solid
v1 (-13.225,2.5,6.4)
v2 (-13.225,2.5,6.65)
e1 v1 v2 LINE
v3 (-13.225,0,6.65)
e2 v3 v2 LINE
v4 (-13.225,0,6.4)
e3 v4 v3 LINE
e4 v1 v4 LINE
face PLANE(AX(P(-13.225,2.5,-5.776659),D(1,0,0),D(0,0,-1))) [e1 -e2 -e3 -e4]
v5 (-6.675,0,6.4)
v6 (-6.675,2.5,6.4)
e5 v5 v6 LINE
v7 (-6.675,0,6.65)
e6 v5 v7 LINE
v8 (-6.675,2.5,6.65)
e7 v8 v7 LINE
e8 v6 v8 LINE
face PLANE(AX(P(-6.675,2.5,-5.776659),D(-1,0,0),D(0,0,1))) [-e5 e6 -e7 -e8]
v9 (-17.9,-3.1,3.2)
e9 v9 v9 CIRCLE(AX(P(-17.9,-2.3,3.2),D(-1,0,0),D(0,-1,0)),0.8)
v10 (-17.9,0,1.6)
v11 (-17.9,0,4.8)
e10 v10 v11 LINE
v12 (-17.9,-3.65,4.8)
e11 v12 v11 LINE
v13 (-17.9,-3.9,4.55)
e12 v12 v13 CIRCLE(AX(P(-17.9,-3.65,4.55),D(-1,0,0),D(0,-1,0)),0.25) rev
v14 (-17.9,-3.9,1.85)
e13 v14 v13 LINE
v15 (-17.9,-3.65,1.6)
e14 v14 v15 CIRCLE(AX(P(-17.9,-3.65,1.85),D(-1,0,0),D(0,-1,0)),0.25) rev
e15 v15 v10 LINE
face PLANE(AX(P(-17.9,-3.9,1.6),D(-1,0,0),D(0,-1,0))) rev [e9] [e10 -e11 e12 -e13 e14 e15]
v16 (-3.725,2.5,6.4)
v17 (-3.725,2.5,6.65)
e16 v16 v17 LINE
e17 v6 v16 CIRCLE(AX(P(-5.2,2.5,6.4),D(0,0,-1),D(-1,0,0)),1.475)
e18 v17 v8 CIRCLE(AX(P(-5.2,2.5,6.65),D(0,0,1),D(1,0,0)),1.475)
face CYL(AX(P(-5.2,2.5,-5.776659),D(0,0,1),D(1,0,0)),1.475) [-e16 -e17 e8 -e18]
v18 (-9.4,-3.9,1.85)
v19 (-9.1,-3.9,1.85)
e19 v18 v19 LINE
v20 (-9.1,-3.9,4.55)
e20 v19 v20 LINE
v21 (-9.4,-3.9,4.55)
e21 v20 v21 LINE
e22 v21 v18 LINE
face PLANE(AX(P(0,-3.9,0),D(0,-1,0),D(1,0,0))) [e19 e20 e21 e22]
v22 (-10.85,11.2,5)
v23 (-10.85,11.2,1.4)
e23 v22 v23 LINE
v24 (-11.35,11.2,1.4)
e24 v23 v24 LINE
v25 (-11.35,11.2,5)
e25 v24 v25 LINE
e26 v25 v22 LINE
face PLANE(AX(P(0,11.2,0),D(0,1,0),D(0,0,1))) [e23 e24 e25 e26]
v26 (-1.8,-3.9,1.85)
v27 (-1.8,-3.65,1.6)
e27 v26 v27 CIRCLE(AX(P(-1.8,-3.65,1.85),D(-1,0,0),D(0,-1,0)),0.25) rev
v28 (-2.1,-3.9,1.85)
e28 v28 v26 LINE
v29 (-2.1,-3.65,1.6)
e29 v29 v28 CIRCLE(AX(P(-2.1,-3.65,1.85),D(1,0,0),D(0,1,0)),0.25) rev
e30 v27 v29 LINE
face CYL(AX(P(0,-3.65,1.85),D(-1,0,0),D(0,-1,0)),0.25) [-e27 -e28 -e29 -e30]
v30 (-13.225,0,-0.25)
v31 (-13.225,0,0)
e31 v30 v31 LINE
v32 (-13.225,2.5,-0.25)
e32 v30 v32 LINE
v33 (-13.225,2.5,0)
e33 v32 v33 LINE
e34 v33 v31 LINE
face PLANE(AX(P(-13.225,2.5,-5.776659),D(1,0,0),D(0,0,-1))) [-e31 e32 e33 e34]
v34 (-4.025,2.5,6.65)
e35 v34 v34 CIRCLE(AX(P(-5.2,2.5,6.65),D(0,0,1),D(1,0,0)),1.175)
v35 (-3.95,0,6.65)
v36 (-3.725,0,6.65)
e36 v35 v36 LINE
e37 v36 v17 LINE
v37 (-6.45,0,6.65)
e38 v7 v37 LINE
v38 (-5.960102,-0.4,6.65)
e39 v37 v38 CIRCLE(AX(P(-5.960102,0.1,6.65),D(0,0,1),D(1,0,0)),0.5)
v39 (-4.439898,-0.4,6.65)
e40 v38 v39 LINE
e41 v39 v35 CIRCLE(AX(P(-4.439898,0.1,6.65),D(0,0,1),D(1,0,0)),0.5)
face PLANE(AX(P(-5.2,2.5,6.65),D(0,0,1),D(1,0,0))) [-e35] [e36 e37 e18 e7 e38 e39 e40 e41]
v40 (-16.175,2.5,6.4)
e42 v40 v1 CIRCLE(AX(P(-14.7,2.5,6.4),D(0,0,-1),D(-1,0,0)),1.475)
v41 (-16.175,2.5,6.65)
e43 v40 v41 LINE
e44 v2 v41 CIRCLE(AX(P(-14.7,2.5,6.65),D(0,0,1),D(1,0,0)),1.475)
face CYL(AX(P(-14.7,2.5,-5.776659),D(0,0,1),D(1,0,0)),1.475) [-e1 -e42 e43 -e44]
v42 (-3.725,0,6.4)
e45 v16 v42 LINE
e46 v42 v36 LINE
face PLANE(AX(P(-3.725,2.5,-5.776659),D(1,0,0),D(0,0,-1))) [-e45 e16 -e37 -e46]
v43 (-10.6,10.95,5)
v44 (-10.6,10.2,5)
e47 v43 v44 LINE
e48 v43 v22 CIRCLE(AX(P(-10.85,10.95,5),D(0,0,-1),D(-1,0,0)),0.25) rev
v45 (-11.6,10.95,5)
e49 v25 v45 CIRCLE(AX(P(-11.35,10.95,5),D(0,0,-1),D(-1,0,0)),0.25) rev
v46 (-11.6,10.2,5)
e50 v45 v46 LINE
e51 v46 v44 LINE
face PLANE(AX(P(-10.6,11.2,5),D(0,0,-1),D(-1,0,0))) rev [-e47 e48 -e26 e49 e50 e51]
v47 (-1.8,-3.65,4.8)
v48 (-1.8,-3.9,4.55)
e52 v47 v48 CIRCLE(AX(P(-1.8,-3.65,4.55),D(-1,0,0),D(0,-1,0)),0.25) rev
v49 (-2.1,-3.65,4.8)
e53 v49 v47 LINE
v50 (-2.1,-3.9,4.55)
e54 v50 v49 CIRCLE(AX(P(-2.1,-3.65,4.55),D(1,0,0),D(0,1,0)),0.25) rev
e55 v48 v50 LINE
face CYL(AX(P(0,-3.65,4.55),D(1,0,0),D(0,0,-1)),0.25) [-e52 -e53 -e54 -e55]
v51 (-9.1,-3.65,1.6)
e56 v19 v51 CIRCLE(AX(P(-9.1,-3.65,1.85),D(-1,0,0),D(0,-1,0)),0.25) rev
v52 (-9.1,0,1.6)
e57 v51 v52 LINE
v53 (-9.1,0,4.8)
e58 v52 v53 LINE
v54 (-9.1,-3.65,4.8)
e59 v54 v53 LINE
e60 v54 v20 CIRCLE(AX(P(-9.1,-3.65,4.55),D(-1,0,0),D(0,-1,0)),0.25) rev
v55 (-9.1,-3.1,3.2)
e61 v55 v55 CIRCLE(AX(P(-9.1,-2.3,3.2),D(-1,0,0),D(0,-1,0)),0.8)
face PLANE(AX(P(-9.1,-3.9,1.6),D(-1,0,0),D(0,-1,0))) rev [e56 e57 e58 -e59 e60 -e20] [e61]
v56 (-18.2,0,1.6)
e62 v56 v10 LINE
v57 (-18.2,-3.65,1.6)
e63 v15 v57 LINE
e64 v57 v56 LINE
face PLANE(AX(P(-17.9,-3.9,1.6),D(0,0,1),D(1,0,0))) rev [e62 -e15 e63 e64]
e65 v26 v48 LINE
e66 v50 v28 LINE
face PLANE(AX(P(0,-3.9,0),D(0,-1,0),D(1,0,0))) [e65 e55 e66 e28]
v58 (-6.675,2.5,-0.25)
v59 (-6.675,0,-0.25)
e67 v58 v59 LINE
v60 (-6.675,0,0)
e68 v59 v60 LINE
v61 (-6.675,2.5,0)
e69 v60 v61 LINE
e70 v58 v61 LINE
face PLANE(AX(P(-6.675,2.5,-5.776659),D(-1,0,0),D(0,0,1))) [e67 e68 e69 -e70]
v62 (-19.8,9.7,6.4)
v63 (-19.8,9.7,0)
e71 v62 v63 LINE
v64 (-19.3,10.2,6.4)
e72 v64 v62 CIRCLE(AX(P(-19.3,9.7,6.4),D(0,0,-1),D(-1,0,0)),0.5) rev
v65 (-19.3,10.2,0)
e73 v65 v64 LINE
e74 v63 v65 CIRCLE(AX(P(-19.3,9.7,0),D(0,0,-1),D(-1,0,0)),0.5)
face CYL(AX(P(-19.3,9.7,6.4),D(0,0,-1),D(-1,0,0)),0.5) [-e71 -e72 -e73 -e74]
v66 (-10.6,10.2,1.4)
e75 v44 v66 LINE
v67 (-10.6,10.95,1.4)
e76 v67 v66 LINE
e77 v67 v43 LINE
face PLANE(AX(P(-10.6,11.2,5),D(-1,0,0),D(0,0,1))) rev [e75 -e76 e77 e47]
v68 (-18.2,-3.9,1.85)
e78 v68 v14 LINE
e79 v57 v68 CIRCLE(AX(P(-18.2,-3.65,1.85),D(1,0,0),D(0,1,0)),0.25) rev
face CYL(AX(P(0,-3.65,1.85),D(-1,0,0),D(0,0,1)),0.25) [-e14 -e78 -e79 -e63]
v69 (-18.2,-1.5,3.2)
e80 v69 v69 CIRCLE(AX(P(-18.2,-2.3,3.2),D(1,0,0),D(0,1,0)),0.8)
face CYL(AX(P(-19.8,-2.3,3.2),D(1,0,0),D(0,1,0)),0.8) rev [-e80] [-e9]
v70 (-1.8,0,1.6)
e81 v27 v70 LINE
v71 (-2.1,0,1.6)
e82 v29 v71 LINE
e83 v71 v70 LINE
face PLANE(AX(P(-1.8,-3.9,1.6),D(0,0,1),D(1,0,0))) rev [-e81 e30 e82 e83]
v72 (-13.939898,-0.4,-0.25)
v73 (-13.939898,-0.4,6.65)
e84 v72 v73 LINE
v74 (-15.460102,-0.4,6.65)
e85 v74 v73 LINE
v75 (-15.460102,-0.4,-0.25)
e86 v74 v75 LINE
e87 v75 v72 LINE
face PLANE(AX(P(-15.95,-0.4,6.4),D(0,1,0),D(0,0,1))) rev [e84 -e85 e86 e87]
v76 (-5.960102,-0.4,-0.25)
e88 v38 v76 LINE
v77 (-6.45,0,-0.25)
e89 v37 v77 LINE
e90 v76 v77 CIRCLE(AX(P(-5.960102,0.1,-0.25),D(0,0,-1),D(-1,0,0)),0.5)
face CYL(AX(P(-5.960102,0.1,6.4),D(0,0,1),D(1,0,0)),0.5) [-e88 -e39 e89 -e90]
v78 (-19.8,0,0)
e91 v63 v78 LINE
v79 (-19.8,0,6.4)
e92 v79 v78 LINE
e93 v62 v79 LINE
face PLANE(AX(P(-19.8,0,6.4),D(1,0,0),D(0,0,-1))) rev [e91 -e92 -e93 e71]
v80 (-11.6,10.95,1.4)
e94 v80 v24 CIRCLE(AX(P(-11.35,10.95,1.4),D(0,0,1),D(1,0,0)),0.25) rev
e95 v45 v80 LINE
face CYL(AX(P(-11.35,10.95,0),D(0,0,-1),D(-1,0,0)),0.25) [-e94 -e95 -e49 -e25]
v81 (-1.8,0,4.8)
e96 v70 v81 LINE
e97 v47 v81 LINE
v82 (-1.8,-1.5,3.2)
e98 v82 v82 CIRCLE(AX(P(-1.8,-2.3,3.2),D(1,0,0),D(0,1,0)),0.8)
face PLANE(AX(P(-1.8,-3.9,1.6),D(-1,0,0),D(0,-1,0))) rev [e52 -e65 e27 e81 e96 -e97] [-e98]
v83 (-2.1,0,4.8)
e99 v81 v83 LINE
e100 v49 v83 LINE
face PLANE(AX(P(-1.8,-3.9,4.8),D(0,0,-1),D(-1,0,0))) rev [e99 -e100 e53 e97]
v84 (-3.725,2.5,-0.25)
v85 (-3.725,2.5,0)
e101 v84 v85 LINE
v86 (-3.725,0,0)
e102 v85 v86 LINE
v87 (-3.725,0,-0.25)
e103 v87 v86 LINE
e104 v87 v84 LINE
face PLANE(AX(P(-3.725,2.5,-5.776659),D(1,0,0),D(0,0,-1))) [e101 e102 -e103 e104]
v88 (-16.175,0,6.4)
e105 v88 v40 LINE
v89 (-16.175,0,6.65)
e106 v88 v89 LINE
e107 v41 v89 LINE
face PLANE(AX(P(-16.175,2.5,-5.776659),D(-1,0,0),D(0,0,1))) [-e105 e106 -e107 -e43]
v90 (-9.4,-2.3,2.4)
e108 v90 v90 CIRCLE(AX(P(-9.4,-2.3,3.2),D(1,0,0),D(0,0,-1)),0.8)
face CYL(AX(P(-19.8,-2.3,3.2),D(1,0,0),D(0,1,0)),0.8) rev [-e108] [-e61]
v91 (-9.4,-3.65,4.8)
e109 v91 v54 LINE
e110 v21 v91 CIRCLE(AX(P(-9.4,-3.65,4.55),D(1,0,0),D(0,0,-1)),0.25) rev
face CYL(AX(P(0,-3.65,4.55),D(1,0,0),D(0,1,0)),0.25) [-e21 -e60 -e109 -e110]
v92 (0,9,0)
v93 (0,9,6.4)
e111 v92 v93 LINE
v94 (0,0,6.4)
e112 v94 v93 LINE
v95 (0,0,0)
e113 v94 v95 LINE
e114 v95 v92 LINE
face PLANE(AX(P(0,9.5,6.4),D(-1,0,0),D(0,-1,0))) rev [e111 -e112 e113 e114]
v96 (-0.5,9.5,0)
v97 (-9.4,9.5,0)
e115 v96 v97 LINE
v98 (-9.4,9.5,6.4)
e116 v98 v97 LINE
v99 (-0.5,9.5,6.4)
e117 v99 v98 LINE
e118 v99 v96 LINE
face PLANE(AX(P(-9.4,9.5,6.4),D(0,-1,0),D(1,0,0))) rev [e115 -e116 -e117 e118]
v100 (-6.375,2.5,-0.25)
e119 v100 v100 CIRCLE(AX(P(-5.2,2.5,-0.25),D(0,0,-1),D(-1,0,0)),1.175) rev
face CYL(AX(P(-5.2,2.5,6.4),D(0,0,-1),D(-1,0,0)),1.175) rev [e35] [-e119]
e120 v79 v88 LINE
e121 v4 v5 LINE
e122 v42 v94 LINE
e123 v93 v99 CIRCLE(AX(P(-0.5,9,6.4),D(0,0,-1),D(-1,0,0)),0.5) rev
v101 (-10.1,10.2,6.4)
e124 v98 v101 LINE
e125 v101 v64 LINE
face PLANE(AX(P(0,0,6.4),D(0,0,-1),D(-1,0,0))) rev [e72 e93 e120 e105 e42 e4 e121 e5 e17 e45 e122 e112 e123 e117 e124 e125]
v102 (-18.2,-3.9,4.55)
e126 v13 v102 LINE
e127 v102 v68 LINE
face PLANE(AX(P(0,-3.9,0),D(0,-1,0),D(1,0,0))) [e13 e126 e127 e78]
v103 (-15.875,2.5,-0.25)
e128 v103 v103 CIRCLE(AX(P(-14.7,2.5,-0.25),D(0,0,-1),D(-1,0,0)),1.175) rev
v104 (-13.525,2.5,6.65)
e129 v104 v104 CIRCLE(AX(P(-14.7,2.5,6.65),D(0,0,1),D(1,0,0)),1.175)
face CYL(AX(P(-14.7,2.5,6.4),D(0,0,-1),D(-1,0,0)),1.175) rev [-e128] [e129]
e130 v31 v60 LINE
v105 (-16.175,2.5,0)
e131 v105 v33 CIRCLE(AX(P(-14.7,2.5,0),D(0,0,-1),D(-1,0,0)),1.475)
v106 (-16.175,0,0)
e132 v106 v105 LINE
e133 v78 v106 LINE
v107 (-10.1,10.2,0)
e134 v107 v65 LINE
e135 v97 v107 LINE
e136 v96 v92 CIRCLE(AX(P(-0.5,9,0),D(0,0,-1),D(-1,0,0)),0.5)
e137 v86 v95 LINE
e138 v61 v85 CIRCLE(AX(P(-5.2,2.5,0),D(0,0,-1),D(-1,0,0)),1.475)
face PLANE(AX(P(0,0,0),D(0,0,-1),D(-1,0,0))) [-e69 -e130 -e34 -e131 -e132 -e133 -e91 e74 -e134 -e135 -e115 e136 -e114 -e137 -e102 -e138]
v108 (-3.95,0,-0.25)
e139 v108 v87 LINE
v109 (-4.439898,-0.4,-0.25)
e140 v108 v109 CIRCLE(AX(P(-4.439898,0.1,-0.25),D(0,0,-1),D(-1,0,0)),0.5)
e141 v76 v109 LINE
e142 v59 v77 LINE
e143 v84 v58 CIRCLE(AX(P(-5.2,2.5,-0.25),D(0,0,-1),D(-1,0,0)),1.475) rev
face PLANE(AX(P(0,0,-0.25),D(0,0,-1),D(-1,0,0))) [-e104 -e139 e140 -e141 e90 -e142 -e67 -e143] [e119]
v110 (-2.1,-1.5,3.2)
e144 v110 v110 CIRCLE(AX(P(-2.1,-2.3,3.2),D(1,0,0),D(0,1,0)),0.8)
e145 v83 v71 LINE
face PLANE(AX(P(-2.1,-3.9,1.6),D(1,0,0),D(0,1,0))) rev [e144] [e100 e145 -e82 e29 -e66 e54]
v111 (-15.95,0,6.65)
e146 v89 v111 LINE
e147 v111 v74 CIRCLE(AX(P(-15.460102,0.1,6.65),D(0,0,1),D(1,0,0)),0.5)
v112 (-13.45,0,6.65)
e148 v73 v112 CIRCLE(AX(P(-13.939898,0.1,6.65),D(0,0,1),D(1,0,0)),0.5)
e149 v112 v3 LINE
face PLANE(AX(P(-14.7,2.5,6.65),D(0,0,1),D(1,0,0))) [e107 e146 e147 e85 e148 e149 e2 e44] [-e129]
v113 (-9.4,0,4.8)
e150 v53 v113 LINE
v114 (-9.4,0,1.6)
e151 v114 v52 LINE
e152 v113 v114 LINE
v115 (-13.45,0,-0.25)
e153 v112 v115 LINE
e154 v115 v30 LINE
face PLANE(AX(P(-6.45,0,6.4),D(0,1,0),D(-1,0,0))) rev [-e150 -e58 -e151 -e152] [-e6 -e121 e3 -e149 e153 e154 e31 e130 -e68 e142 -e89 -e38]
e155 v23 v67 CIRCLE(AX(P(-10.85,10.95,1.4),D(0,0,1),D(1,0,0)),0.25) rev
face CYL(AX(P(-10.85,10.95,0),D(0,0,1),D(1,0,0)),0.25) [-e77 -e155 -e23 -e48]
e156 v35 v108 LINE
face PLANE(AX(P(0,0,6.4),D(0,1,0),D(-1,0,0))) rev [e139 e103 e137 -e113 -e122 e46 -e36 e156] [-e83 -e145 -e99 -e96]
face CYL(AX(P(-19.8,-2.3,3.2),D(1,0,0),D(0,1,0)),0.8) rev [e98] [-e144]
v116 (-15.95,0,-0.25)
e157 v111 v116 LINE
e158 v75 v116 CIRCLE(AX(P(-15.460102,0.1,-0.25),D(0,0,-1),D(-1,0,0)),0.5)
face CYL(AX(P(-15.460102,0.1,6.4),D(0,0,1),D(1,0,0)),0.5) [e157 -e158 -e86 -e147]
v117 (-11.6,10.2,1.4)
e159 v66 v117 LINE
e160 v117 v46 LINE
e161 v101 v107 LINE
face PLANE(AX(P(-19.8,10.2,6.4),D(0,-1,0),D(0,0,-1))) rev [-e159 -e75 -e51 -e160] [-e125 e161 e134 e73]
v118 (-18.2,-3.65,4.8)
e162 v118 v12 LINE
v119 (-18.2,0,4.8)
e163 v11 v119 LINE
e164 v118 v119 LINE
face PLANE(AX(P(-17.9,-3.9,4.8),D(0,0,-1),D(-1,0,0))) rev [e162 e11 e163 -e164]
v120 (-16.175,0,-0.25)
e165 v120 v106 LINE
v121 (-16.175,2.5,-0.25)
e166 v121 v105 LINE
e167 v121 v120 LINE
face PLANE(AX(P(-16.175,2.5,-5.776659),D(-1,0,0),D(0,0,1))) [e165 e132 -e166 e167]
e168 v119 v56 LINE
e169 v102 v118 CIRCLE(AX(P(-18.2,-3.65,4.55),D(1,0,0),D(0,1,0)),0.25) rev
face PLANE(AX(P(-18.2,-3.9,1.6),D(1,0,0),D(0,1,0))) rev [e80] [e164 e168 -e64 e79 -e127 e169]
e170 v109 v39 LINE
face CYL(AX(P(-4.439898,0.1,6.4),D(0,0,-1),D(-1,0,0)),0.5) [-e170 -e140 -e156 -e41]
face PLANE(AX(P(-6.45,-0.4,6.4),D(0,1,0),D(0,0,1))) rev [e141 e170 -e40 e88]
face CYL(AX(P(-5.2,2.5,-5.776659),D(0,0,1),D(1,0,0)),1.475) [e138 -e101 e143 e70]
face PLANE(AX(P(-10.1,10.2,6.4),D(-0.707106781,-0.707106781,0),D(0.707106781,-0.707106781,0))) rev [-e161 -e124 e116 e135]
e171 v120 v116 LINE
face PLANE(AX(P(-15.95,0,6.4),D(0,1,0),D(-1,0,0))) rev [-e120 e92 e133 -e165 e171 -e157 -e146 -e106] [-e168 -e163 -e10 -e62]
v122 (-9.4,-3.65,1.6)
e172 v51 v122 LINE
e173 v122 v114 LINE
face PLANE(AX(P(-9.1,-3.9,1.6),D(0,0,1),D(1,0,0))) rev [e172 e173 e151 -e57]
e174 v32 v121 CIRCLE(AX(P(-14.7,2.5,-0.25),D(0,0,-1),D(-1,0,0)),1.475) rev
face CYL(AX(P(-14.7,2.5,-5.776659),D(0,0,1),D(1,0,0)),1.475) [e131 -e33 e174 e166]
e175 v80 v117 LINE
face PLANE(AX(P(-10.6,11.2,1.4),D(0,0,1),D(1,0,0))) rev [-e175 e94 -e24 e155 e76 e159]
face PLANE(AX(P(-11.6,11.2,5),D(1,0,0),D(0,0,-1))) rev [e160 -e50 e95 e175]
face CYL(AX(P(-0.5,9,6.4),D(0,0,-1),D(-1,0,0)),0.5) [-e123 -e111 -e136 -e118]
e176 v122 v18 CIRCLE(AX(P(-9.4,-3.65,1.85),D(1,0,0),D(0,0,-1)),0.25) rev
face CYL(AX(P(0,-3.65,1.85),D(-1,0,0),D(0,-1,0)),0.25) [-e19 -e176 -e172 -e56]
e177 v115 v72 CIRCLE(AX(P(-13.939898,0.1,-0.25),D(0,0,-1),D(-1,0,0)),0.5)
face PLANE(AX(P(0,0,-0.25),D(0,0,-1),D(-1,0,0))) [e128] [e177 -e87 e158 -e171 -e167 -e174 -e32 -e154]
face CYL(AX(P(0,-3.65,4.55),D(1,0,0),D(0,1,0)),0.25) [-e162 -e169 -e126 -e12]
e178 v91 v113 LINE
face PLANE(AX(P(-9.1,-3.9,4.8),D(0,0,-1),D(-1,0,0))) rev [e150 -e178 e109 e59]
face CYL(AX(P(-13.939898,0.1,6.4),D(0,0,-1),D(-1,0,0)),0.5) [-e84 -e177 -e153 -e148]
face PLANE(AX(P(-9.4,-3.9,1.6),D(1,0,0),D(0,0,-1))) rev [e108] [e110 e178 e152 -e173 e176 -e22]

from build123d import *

# Parameters (mm, degrees)
SKETCH1_R                = 1.175
BOSS_EXTRUDE1_DEPTH      = 6.4
SKETCH2_W                = 1
SKETCH2_H                = 3.6
BOSS_EXTRUDE2_DEPTH      = 1
SKETCH3_W                = 0.3
SKETCH3_H                = 3.2
BOSS_EXTRUDE3_DEPTH      = 3.9
SKETCH4_R                = 0.8
CUT_EXTRUDE1_DEPTH       = 23.144976857
BOSS_EXTRUDE4_DEPTH      = 0.25
BOSS_EXTRUDE4_DEPTH_BACK = 6.65
SKETCH5_R                = 1.175
FILLET1_R                = 0.5
FILLET2_R                = 0.25
FILLET3_R                = 0.25


with BuildPart() as part:
    # Sketch1 → Boss-Extrude1 (new body)
    with BuildSketch(Plane.XY):
        Polygon((0, 0), (-3.95, 0), (-3.95, -0.4), (-6.45, -0.4), (-6.45, 0), (-13.45, 0), (-13.45, -0.4), (-15.95, -0.4), (-15.95, 0), (-19.8, 0), (-19.8, 10.2), (-10.1, 10.2), (-9.4, 9.5), (0, 9.5), align=None)
        with Locations((-14.7, 2.5)):
            Circle(SKETCH1_R, mode=Mode.SUBTRACT)
        with Locations((-5.2, 2.5)):
            Circle(SKETCH1_R, mode=Mode.SUBTRACT)
    extrude(amount=BOSS_EXTRUDE1_DEPTH)

    # Sketch2 → Boss-Extrude2 (add)
    with BuildSketch(Plane(origin=(0, 10.2, 0), x_dir=(1, 0, 0), z_dir=(0, 1, 0))):
        with Locations((-11.1, -3.2)):
            Rectangle(SKETCH2_W, SKETCH2_H)
    extrude(amount=BOSS_EXTRUDE2_DEPTH)

    # Sketch3 → Boss-Extrude3 (add)
    with BuildSketch(Plane.XZ):
        with Locations((-18.05, 3.2)):
            Rectangle(SKETCH3_W, SKETCH3_H)
        with Locations((-9.25, 3.2)):
            Rectangle(SKETCH3_W, SKETCH3_H)
        with Locations((-1.95, 3.2)):
            Rectangle(SKETCH3_W, SKETCH3_H)
    extrude(amount=BOSS_EXTRUDE3_DEPTH)

    # Sketch4 → Cut-Extrude1 (cut, through all)
    with BuildSketch(Plane(origin=(-1.8, 0, 0), x_dir=(0, 0, -1), z_dir=(1, 0, 0))):
        with Locations(Location((-3.2, -2.3, 0), (0, 0, 90))):
            Circle(SKETCH4_R)
    extrude(amount=-CUT_EXTRUDE1_DEPTH, mode=Mode.SUBTRACT)

    # Sketch5 → Boss-Extrude4 (add, two sides: drawn at the far end of the back side and taken through both)
    # profile 1 of 2: a face of its own
    with BuildSketch(Plane.XY.offset(6.4).offset(-BOSS_EXTRUDE4_DEPTH_BACK)):
        with BuildLine():
            Line((-16.175, 2.5), (-16.175, 0))
            Line((-16.175, 0), (-15.95, 0))
            Line((-15.95, 0), (-15.95, -0.4))
            Line((-15.95, -0.4), (-13.45, -0.4))
            Line((-13.45, -0.4), (-13.45, 0))
            Line((-13.45, 0), (-13.225, 0))
            Line((-13.225, 0), (-13.225, 2.5))
            ThreePointArc((-13.225, 2.5), (-14.7, 3.975), (-16.175, 2.5))
        make_face()
        with Locations(Location((-14.7, 2.5, 0), (0, 0, 180))):
            Circle(SKETCH5_R, mode=Mode.SUBTRACT)
    # profile 2 of 2: a face of its own
    with BuildSketch(Plane.XY.offset(6.4).offset(-BOSS_EXTRUDE4_DEPTH_BACK)):
        with BuildLine():
            Line((-6.675, 2.5), (-6.675, 0))
            Line((-6.675, 0), (-6.45, 0))
            Line((-6.45, 0), (-6.45, -0.4))
            Line((-6.45, -0.4), (-3.95, -0.4))
            Line((-3.95, -0.4), (-3.95, 0))
            Line((-3.95, 0), (-3.725, 0))
            Line((-3.725, 0), (-3.725, 2.5))
            ThreePointArc((-3.725, 2.5), (-5.2, 3.975), (-6.675, 2.5))
        make_face()
        with Locations(Location((-5.2, 2.5, 0), (0, 0, 180))):
            Circle(SKETCH5_R, mode=Mode.SUBTRACT)
    extrude(amount=BOSS_EXTRUDE4_DEPTH + BOSS_EXTRUDE4_DEPTH_BACK)

    # Fillet1
    # the kernel refuses this fillet: 0.5 mm, written as the material it takes off along each edge
    with BuildSketch(Plane(origin=(-19.8, 10.2, -1.25), x_dir=(0, -1, 0), z_dir=(0, 0, 1)), Plane(origin=(0, 9.5, -1.25), x_dir=(-1, 0, 0), z_dir=(0, 0, 1))) as fillet1_piece_1:
        with BuildLine():
            CenterArc((FILLET1_R, FILLET1_R), FILLET1_R, 180, 90)
            Line((0, FILLET1_R), (-FILLET1_R * 0.02, FILLET1_R))
            Line((-FILLET1_R * 0.02, FILLET1_R), (-FILLET1_R * 0.02, -FILLET1_R * 0.02))
            Line((-FILLET1_R * 0.02, -FILLET1_R * 0.02), (FILLET1_R, -FILLET1_R * 0.02))
            Line((FILLET1_R, -FILLET1_R * 0.02), (FILLET1_R, 0))
        make_face()
    extrude(amount=8.9, mode=Mode.SUBTRACT)
    with BuildSketch(Plane(origin=(-3.95, -0.4, 7.874744871), x_dir=(-1, 0, 0), z_dir=(0, 0, -1))) as fillet1_piece_2:
        with BuildLine():
            CenterArc((0.489897949, 0.5), FILLET1_R, 191.536959033, 78.463040967)
            Line((0, 0.4), (-0.009797959, 0.398))
            ThreePointArc((-0.009797959, 0.398), (-0.01, 0.2), (-0.01, 0))
            Line((-0.01, 0), (0, -0.01))
            Line((0, -0.01), (0.489897949, -0.01))
            Line((0.489897949, -0.01), (0.489897949, 0))
        make_face()
    extrude(amount=9.349489743, mode=Mode.SUBTRACT)
    with BuildSketch(Plane(origin=(-6.45, -0.4, 0), x_dir=(1, 0, 0), z_dir=(0, 0, 1))) as fillet1_piece_3:
        with BuildLine():
            CenterArc((0.489897949, 0.5), FILLET1_R, 191.536959033, 78.463040967)
            Line((0, 0.4), (-0.009797959, 0.398))
            ThreePointArc((-0.009797959, 0.398), (-0.01, 0.2), (-0.01, 0))
            Line((-0.01, 0), (0, -0.01))
            Line((0, -0.01), (0.489897949, -0.01))
            Line((0.489897949, -0.01), (0.489897949, 0))
        make_face()
    extrude(amount=6.4, mode=Mode.SUBTRACT)
    with BuildSketch(Plane(origin=(-13.45, -0.4, -1.474744871), x_dir=(-1, 0, 0), z_dir=(0, 0, 1))) as fillet1_piece_4:
        with BuildLine():
            CenterArc((0.489897949, -0.5), FILLET1_R, 90, 78.463040967)
            Line((0, -0.4), (-0.009797959, -0.398))
            ThreePointArc((-0.009797959, -0.398), (-0.01, -0.2), (-0.01, 0))
            Line((-0.01, 0), (0, 0.01))
            Line((0, 0.01), (0.489897949, 0.01))
            Line((0.489897949, 0.01), (0.489897949, 0))
        make_face()
    extrude(amount=9.349489743, mode=Mode.SUBTRACT)
    with BuildSketch(Plane(origin=(-15.95, -0.4, -1.474744871), x_dir=(0, 1, 0), z_dir=(0, 0, 1))) as fillet1_piece_5:
        with BuildLine():
            CenterArc((0.5, -0.489897949), FILLET1_R, 101.536959033, 78.463040967)
            Line((0, -0.489897949), (-0.01, -0.489897949))
            Line((-0.01, -0.489897949), (-0.01, 0))
            Line((-0.01, 0), (0, 0.01))
            ThreePointArc((0, 0.01), (0.2, 0.01), (0.398, 0.009797959))
            Line((0.398, 0.009797959), (0.4, 0))
        make_face()
    extrude(amount=9.349489743, mode=Mode.SUBTRACT)
    with BuildSketch(Plane(origin=(-6.45, -0.4, -1.474744871), x_dir=(1, 0, 0), z_dir=(0, 0, 1))) as fillet1_piece_6:
        with BuildLine():
            CenterArc((0.489897949, 0.5), FILLET1_R, 191.536959033, 78.463040967)
            Line((0, 0.4), (-0.009797959, 0.398))
            ThreePointArc((-0.009797959, 0.398), (-0.01, 0.2), (-0.01, 0))
            Line((-0.01, 0), (0, -0.01))
            Line((0, -0.01), (0.489897949, -0.01))
            Line((0.489897949, -0.01), (0.489897949, 0))
        make_face()
    extrude(amount=1.474744871, mode=Mode.SUBTRACT)
    with BuildSketch(Plane(origin=(-6.45, -0.4, 6.4), x_dir=(1.578737141016463e-12, 1.0, 0), z_dir=(0, 0, 1))) as fillet1_piece_7:
        with BuildLine():
            CenterArc((0.5, -0.489897949), FILLET1_R, 101.536959033, 78.463040967)
            Line((0, -0.489897949), (-0.01, -0.489897949))
            Line((-0.01, -0.489897949), (-0.01, 0))
            Line((-0.01, 0), (0, 0.01))
            ThreePointArc((0, 0.01), (0.2, 0.01), (0.398, 0.009797959))
            Line((0.398, 0.009797959), (0.4, 0))
        make_face()
    extrude(amount=1.474744871, mode=Mode.SUBTRACT)

    # Fillet2
    fillet2_edges = [part.edges().sort_by_distance(p)[0] for p in [
        (-18.05, -3.9, 1.6),
        (-18.05, -3.9, 4.8),
        (-9.25, -3.9, 1.6),
        (-9.25, -3.9, 4.8),
        (-1.95, -3.9, 1.6),
        (-1.95, -3.9, 4.8),
    ]]
    fillet(fillet2_edges, radius=FILLET2_R)

    # Fillet3
    fillet3_edges = [part.edges().sort_by_distance(p)[0] for p in [
        (-11.6, 11.2, 3.2),
        (-10.6, 11.2, 3.2),
    ]]
    fillet(fillet3_edges, radius=FILLET3_R)


solid = part.part
